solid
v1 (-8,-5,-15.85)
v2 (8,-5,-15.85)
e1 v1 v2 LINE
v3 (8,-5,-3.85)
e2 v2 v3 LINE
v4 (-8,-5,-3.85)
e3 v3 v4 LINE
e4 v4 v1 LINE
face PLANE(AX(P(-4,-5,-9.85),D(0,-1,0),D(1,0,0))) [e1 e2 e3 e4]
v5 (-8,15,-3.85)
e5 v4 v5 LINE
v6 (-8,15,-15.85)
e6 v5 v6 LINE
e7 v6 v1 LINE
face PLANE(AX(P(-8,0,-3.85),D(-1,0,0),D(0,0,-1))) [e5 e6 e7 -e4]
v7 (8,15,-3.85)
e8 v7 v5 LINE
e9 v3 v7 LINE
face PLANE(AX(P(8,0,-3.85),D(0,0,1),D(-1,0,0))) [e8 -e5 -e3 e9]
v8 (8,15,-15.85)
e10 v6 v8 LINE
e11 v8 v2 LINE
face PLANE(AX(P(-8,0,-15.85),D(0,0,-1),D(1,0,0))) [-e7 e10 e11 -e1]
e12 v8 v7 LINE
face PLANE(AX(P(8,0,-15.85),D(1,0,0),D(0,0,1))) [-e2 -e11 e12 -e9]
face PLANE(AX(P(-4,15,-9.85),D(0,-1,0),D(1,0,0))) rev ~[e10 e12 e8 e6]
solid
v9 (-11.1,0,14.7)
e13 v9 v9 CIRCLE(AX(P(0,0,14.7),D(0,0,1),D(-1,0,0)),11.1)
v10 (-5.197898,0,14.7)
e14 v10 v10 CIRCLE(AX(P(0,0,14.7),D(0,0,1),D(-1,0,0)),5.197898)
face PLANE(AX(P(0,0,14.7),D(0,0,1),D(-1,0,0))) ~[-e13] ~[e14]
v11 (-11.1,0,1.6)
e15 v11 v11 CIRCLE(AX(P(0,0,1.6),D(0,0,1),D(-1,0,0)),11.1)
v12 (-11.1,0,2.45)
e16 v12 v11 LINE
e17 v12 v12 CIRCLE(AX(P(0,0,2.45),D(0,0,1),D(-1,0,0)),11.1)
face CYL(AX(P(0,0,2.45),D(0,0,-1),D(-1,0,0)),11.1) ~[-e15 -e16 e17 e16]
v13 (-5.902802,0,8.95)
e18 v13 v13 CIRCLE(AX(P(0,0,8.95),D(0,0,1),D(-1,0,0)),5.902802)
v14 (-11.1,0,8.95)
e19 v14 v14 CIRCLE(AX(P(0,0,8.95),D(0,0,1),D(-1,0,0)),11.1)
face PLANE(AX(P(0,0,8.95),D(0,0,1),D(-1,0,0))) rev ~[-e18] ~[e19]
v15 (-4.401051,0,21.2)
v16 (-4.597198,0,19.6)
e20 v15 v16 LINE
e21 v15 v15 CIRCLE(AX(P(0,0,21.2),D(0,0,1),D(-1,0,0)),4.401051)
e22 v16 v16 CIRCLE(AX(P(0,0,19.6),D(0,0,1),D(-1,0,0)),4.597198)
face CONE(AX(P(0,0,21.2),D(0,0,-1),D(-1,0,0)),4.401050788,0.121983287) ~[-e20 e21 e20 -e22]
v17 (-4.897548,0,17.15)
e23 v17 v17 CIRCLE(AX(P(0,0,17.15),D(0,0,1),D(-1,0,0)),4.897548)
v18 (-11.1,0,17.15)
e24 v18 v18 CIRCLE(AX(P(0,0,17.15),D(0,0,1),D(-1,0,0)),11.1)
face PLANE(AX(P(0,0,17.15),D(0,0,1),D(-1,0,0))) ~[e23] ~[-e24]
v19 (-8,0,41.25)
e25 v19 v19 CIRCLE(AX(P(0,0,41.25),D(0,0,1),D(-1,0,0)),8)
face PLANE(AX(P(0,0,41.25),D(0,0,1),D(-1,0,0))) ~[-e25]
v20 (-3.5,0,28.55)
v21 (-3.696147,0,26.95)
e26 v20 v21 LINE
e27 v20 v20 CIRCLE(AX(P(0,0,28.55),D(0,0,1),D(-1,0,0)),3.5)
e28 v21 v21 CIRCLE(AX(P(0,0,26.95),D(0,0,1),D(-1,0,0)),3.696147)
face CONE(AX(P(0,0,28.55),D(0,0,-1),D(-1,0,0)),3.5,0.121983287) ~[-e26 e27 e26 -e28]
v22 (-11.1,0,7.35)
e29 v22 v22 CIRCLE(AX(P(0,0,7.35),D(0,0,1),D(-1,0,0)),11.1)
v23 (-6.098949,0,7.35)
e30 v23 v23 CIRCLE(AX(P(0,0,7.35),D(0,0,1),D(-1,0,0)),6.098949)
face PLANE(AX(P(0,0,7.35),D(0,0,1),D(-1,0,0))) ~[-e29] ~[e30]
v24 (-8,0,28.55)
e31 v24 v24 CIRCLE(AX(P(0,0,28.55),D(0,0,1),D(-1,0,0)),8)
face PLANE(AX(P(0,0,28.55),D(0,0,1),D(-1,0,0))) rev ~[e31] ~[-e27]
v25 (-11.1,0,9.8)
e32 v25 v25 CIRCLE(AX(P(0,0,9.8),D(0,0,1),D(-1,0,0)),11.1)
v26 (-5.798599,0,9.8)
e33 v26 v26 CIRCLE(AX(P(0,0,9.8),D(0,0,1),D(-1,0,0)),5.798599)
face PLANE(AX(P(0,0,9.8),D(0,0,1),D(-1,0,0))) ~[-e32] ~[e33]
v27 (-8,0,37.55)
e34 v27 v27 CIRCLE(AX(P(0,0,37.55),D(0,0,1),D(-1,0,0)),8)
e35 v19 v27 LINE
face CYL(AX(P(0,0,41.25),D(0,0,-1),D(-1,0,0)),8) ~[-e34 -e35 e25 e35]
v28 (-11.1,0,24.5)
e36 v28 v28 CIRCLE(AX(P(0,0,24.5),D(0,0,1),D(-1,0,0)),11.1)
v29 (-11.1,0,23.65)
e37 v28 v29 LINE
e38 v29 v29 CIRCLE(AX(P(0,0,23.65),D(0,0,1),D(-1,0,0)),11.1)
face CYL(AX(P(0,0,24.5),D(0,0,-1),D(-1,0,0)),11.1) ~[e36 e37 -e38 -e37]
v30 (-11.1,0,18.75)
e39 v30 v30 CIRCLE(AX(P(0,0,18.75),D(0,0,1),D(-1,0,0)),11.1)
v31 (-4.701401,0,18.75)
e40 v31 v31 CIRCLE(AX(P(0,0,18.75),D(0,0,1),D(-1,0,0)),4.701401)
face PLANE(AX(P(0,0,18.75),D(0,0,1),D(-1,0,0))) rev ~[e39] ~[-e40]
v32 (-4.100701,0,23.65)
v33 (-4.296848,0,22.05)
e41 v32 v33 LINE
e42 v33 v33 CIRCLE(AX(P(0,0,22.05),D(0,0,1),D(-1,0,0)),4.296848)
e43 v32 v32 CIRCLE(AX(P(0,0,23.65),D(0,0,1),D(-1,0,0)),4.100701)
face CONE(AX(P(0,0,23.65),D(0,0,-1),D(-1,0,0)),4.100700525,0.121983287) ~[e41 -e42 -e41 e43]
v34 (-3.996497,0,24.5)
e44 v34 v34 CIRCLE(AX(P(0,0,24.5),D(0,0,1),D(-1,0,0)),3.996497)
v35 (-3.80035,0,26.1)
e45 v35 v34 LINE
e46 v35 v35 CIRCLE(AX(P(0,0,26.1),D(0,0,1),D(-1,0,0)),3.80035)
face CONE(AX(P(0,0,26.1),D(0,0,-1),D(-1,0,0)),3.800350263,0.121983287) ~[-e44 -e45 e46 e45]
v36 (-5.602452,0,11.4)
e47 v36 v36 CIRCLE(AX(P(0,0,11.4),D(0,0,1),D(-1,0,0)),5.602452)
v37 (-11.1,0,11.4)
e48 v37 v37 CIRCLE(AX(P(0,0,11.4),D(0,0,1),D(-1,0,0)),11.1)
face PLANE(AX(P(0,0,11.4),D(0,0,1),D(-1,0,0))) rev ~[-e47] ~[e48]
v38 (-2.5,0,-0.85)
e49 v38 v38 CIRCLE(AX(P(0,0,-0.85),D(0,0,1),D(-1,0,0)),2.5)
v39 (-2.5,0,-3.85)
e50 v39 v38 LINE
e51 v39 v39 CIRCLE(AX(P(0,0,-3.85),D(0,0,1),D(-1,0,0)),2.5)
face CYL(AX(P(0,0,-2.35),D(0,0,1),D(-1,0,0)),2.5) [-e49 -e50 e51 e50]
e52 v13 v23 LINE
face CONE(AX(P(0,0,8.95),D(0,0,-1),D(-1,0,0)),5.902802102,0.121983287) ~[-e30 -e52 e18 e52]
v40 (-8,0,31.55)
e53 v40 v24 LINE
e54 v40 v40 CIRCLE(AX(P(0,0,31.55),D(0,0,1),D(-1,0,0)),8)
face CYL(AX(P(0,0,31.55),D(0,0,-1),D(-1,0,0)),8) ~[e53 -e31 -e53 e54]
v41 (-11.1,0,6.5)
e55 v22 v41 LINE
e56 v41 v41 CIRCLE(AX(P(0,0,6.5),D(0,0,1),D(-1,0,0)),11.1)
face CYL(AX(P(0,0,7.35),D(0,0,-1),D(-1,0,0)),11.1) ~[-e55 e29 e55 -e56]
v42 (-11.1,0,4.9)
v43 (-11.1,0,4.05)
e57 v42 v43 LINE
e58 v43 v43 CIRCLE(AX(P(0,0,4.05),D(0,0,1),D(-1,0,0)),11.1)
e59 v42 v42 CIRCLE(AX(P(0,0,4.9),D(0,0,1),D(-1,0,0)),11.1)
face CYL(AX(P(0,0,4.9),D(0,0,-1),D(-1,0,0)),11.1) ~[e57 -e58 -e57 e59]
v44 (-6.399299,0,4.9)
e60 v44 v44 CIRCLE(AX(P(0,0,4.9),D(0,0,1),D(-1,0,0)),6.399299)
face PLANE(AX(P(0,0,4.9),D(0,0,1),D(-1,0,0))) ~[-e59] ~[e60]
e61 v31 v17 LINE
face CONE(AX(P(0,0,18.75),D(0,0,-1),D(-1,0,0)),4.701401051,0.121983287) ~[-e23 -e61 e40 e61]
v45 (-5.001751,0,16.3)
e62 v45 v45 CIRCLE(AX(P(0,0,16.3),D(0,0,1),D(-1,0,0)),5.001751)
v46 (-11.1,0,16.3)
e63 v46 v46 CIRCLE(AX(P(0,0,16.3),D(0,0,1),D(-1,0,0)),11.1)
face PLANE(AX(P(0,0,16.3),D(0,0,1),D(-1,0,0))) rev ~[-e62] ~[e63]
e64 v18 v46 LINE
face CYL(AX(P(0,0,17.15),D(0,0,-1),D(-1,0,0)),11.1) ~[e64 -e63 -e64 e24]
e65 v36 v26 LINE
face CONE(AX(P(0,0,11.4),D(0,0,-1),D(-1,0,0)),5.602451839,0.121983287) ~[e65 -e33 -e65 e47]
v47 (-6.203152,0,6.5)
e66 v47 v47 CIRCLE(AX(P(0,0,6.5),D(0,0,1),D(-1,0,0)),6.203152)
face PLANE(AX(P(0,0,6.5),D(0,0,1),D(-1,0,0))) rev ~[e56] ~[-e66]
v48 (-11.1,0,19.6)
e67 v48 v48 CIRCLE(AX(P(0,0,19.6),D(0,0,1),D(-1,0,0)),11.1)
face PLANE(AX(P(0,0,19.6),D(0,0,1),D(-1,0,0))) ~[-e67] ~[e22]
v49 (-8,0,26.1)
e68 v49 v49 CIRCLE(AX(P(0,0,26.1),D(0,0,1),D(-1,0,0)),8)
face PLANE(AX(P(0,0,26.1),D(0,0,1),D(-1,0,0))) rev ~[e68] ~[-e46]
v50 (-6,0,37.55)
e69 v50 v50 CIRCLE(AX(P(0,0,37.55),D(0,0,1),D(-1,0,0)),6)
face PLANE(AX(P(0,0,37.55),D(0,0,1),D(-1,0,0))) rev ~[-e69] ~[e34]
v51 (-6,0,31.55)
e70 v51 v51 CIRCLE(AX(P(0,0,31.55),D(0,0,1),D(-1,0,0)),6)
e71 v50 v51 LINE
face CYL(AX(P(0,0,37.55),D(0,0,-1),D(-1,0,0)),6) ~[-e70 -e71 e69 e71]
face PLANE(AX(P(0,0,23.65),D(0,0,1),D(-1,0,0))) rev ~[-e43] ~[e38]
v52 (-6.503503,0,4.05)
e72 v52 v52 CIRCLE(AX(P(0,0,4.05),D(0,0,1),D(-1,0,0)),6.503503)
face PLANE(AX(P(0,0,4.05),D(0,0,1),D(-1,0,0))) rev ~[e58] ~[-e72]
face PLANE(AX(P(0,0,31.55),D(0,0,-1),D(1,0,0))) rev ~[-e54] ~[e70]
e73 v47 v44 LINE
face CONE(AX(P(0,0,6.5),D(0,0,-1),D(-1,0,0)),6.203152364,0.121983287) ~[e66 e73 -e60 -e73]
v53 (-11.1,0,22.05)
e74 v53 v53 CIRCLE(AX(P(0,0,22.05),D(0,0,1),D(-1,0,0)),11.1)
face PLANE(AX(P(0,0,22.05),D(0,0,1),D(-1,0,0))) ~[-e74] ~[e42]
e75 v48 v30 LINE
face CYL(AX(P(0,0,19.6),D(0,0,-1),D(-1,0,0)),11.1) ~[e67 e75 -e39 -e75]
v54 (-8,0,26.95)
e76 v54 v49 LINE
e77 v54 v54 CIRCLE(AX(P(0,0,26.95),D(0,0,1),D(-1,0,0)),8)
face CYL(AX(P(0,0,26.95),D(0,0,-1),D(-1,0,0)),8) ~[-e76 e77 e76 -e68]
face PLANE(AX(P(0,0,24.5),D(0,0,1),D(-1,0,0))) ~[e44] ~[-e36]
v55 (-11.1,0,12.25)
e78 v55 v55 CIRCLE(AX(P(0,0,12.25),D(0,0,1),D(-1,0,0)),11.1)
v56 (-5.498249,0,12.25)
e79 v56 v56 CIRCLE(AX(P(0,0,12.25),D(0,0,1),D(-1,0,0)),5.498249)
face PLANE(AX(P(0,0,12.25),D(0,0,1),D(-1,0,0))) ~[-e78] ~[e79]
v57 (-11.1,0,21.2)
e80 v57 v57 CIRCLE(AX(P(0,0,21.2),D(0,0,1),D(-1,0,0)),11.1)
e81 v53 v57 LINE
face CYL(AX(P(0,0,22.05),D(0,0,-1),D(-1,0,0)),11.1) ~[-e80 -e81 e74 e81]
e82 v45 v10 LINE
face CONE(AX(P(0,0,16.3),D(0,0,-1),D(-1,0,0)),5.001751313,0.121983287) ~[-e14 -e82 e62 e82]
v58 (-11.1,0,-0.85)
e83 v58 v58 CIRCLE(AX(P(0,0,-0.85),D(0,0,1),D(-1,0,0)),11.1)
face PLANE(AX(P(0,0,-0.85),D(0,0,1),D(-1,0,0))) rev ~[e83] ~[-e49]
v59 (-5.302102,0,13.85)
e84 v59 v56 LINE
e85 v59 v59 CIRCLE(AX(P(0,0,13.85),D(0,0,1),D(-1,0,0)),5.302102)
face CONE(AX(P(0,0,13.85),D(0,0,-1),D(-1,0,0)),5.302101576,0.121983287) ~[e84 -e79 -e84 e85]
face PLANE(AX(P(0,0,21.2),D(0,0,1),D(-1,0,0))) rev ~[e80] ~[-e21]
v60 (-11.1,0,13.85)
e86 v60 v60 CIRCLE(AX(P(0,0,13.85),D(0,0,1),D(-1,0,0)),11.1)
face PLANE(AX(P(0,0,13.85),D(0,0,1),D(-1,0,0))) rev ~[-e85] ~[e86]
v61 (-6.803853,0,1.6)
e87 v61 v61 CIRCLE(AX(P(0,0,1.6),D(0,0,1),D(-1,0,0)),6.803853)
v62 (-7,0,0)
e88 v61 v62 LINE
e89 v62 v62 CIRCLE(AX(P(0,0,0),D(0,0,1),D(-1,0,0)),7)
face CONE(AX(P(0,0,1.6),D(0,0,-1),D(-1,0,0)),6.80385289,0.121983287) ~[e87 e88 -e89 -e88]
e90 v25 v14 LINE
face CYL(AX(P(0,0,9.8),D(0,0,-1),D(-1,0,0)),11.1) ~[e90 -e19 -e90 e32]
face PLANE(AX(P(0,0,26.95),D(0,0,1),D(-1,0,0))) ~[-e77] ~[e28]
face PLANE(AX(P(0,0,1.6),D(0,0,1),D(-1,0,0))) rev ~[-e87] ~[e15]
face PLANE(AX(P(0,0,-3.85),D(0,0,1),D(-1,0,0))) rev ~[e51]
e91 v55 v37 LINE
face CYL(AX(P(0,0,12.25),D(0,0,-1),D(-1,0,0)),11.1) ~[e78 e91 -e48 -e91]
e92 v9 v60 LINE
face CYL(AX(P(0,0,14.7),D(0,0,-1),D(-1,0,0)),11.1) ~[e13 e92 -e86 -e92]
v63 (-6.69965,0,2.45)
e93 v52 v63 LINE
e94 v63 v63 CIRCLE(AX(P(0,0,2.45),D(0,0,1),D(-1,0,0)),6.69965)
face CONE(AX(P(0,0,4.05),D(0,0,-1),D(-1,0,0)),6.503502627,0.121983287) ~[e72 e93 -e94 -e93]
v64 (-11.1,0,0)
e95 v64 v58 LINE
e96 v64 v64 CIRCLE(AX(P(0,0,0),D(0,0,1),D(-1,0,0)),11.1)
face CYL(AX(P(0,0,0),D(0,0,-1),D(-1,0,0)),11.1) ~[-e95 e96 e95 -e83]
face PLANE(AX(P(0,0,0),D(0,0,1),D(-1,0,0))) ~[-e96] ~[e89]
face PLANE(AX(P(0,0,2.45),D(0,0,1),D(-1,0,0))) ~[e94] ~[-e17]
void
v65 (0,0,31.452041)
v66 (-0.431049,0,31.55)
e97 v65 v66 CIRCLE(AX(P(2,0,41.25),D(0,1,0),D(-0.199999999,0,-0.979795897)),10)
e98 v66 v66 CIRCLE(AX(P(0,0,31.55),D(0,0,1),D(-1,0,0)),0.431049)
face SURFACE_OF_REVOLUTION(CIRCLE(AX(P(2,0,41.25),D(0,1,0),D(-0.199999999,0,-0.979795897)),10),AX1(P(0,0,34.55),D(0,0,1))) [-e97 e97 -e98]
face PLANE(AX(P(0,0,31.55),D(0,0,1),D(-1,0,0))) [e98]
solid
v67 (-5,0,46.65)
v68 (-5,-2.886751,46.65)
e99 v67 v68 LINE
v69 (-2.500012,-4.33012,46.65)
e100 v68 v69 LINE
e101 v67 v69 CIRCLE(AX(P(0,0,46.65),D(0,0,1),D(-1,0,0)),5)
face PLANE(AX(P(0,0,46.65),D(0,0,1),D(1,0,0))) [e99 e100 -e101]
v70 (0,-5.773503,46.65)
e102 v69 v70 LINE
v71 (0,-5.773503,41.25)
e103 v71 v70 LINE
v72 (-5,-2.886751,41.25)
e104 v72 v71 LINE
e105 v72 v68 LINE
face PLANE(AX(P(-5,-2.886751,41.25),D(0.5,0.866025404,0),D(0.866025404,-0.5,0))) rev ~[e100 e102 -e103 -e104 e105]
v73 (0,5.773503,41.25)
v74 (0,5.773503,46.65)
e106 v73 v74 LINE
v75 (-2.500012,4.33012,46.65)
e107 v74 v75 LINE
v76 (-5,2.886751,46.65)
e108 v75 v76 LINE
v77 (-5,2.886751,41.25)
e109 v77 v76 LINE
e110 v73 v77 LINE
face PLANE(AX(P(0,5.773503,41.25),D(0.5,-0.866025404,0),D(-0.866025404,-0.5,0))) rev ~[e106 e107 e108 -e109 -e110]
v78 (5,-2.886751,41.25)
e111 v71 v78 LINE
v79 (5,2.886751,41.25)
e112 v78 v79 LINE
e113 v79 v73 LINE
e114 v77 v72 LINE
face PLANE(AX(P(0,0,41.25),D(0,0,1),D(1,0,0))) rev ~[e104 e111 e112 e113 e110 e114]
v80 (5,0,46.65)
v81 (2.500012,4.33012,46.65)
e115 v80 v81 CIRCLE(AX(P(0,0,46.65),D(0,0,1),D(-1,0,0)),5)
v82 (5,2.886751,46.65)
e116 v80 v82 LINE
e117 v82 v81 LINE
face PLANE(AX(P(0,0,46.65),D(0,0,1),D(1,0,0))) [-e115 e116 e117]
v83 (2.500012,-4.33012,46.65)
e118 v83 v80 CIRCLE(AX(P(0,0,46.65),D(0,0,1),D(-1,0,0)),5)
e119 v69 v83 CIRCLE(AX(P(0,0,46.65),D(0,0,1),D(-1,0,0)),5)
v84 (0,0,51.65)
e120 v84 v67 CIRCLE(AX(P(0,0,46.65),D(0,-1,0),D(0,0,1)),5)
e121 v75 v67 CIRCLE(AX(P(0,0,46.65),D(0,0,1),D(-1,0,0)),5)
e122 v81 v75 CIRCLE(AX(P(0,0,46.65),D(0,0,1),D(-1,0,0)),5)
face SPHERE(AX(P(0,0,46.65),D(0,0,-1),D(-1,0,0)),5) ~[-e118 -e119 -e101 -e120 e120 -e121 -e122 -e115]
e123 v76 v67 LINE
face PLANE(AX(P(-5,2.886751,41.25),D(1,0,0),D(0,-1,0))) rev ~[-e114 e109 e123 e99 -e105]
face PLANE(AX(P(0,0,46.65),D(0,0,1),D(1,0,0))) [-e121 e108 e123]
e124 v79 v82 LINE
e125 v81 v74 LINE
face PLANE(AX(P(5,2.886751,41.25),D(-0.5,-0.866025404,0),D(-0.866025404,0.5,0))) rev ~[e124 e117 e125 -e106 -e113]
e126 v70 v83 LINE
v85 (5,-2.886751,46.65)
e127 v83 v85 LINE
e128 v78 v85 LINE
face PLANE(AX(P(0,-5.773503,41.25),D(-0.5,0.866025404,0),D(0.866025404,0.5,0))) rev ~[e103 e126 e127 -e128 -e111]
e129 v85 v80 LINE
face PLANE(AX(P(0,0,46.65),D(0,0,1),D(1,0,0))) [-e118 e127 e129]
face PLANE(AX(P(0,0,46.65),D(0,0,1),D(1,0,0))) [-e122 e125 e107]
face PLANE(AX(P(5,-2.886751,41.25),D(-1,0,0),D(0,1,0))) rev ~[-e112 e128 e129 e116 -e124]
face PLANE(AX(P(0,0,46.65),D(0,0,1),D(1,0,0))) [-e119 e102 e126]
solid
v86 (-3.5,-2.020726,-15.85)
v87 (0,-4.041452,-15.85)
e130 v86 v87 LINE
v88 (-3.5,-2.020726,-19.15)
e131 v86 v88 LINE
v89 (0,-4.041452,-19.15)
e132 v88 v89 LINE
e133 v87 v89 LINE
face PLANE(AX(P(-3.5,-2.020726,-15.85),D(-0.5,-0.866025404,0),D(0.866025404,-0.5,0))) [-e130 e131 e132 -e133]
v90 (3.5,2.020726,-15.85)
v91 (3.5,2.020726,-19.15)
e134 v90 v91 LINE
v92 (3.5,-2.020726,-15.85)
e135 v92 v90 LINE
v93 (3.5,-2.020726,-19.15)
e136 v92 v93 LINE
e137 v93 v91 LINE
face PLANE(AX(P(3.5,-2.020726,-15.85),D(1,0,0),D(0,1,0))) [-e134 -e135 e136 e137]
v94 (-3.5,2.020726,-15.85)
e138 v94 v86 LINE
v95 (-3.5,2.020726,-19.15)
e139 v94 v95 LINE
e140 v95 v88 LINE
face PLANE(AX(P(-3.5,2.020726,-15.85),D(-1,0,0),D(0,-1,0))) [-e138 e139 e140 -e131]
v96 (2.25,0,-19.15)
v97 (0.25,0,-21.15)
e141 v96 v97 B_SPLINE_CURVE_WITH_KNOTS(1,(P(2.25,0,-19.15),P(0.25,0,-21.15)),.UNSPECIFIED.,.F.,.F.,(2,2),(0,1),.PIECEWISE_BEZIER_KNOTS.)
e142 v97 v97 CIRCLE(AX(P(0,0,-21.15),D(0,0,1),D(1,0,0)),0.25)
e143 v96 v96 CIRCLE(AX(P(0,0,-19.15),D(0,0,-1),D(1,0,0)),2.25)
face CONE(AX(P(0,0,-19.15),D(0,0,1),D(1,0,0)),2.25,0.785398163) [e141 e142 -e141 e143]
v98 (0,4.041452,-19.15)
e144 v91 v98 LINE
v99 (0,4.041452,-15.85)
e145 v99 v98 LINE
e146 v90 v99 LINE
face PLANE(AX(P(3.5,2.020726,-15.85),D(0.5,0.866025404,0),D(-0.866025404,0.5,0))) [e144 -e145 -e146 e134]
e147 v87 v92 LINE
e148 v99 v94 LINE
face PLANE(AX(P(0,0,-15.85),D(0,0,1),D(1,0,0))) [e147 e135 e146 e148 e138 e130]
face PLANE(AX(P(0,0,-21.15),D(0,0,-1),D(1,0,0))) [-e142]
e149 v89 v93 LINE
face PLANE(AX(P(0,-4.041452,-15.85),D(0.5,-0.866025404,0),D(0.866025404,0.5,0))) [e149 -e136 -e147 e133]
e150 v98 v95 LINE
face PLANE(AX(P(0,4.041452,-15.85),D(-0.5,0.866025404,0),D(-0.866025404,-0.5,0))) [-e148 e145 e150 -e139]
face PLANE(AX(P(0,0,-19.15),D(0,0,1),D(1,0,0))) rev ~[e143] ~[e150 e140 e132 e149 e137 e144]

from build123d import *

# Parameters (mm, degrees)
F0_W          = 2.5
F0_H          = 3
F3_START      = 41.25
F2_R          = 4
F3_DEPTH      = 5.4
F0_W_2        = 8
F0_H_2        = 12
F4_DEPTH      = 5
F4_DEPTH_BACK = 15
F6_START      = -15.85
F5_R          = 2.25
F6_DEPTH      = 3.3
F8_R          = 2.25
F9_DEPTH      = 2
F9_TAPER      = 45


with BuildPart() as f1:
    # F0 (on Front) → F1 (revolve)
    with BuildSketch(Plane.XZ):
        Polygon((-6, 37.55), (0, 37.55), (0, 41.25), (-8, 41.25), (-8, 37.55), align=None)
        Polygon((-0.4310491562, 31.55), (0, 31.55), (0, 37.55), (-6, 37.55), (-6, 31.55), align=None)
        with BuildLine():
            Line((-3.5, 28.55), (0, 28.55))
            Line((0, 28.55), (0, 31.4520410289))
            ThreePointArc((0, 31.4520410289), (-0.2160659165, 31.4986384615), (-0.4310491562, 31.55))
            Line((-0.4310491562, 31.55), (-6, 31.55))
            Line((-6, 31.55), (-8, 31.55))
            Line((-8, 31.55), (-8, 28.55))
            Line((-8, 28.55), (-3.5, 28.55))
        make_face()
        Polygon((-3.6961471103, 26.95), (0, 26.95), (0, 28.55), (-3.5, 28.55), align=None)
        Polygon((-5.3021015762, 13.85), (0, 13.85), (0, 14.7), (-5.1978984238, 14.7), align=None)
        Polygon((0, -0.85), (0, 0), (-7, 0), (-11.1, 0), (-11.1, -0.85), (-2.5, -0.85), align=None)
        Polygon((-6.8038528897, 1.6), (0, 1.6), (0, 2.45), (-6.6996497373, 2.45), align=None)
        Polygon((-4.5971978984, 19.6), (0, 19.6), (0, 21.2), (-4.4010507881, 21.2), align=None)
        Polygon((-3.8003502627, 26.1), (0, 26.1), (0, 26.95), (-3.6961471103, 26.95), align=None)
        Polygon((-5.9028021016, 8.95), (0, 8.95), (0, 9.8), (-5.7985989492, 9.8), align=None)
        Polygon((-6.503502627, 4.05), (0, 4.05), (0, 4.9), (-6.3992994746, 4.9), align=None)
        Polygon((-3.996497373, 24.5), (0, 24.5), (0, 26.1), (-3.8003502627, 26.1), align=None)
        Polygon((-5.7985989492, 9.8), (0, 9.8), (0, 11.4), (-5.6024518389, 11.4), align=None)
        Polygon((-5.0017513135, 16.3), (0, 16.3), (0, 17.15), (-4.8975481611, 17.15), align=None)
        Polygon((-4.1007005254, 23.65), (0, 23.65), (0, 24.5), (-3.996497373, 24.5), align=None)
        Polygon((-6.2031523643, 6.5), (0, 6.5), (0, 7.35), (-6.0989492119, 7.35), align=None)
        Polygon((-6.0989492119, 7.35), (0, 7.35), (0, 8.95), (-5.9028021016, 8.95), align=None)
        Polygon((-6.6996497373, 2.45), (0, 2.45), (0, 4.05), (-6.503502627, 4.05), align=None)
        Polygon((-7, 0), (0, 0), (0, 1.6), (-6.8038528897, 1.6), align=None)
        Polygon((-6.3992994746, 4.9), (0, 4.9), (0, 6.5), (-6.2031523643, 6.5), align=None)
        Polygon((-4.8975481611, 17.15), (0, 17.15), (0, 18.75), (-4.7014010508, 18.75), align=None)
        Polygon((-4.2968476357, 22.05), (0, 22.05), (0, 23.65), (-4.1007005254, 23.65), align=None)
        Polygon((-5.4982486865, 12.25), (0, 12.25), (0, 13.85), (-5.3021015762, 13.85), align=None)
        Polygon((-4.7014010508, 18.75), (0, 18.75), (0, 19.6), (-4.5971978984, 19.6), align=None)
        Polygon((-4.4010507881, 21.2), (0, 21.2), (0, 22.05), (-4.2968476357, 22.05), align=None)
        Polygon((-5.1978984238, 14.7), (0, 14.7), (0, 16.3), (-5.0017513135, 16.3), align=None)
        Polygon((-5.6024518389, 11.4), (0, 11.4), (0, 12.25), (-5.4982486865, 12.25), align=None)
        Polygon((-8, 26.1), (-3.8003502627, 26.1), (-3.6961471103, 26.95), (-8, 26.95), align=None)
        Polygon((-11.1, 23.65), (-4.1007005254, 23.65), (-3.996497373, 24.5), (-11.1, 24.5), align=None)
        Polygon((-11.1, 21.2), (-4.4010507881, 21.2), (-4.2968476357, 22.05), (-11.1, 22.05), align=None)
        Polygon((-11.1, 18.75), (-4.7014010508, 18.75), (-4.5971978984, 19.6), (-11.1, 19.6), align=None)
        Polygon((-11.1, 16.3), (-5.0017513135, 16.3), (-4.8975481611, 17.15), (-11.1, 17.15), align=None)
        Polygon((-11.1, 13.85), (-5.3021015762, 13.85), (-5.1978984238, 14.7), (-11.1, 14.7), align=None)
        Polygon((-11.1, 11.4), (-5.6024518389, 11.4), (-5.4982486865, 12.25), (-11.1, 12.25), align=None)
        Polygon((-11.1, 8.95), (-5.9028021016, 8.95), (-5.7985989492, 9.8), (-11.1, 9.8), align=None)
        Polygon((-11.1, 6.5), (-6.2031523643, 6.5), (-6.0989492119, 7.35), (-11.1, 7.35), align=None)
        Polygon((-11.1, 4.05), (-6.503502627, 4.05), (-6.3992994746, 4.9), (-11.1, 4.9), align=None)
        Polygon((-11.1, 1.6), (-6.8038528897, 1.6), (-6.6996497373, 2.45), (-11.1, 2.45), align=None)
        with Locations((-1.25, -2.35)):
            Rectangle(F0_W, F0_H)
    revolve(axis=Axis((0, 0, 34.55), (0, 0, 1)))


with BuildPart() as f1b:
    # F0 (on Front) → F1, piece 2 (revolve)
    with BuildSketch(Plane.XZ):
        with BuildLine():
            Line((0, 46.65), (0, 51.65))
            ThreePointArc((0, 51.65), (-3.5355339059, 50.1855339059), (-5, 46.65))
            Line((-5, 46.65), (0, 46.65))
        make_face()
    revolve(axis=Axis((0, 0, 34.55), (0, 0, 1)))

    # F2 (on Top) → F3 (join)
    with BuildSketch(Plane.XY.offset(F3_START)):
        Polygon((5, -2.8867513459), (5, 2.8867513459), (0, 5.7735026919), (-5, 2.8867513459), (-5, -2.8867513459), (0, -5.7735026919), align=None)
        Circle(F2_R, mode=Mode.SUBTRACT)
        Circle(F2_R)
    extrude(amount=F3_DEPTH)


with BuildPart() as f4:
    # F0 (on Front) → F4 (new body, two sides)
    with BuildSketch(Plane.XZ) as f4_sk:
        Polygon((0, -15.85), (0, -3.85), (-2.5, -3.85), (-8, -3.85), (-8, -15.85), align=None)
        with Locations((4, -9.85)):
            Rectangle(F0_W_2, F0_H_2)
    extrude(amount=F4_DEPTH)
    extrude(f4_sk.sketch, amount=-F4_DEPTH_BACK)


with BuildPart() as f6:
    # F5 (on Top) → F6 (new body)
    with BuildSketch(Plane.XY.offset(F6_START)):
        Polygon((3.5, -2.0207259422), (3.5, 2.0207259422), (0, 4.0414518843), (-3.5, 2.0207259422), (-3.5, -2.0207259422), (0, -4.0414518843), align=None)
        Circle(F5_R, mode=Mode.SUBTRACT)
        Circle(F5_R)
    extrude(amount=-F6_DEPTH)

    # F8 (on offset) → F9 (join)
    with BuildSketch(Plane(origin=(0, 0, -19.15), x_dir=(1, 0, 0), z_dir=(0, 0, -1))):
        Circle(F8_R)
    extrude(amount=F9_DEPTH, taper=F9_TAPER)


solid = Compound([f1.part, f1b.part, f4.part, f6.part])
